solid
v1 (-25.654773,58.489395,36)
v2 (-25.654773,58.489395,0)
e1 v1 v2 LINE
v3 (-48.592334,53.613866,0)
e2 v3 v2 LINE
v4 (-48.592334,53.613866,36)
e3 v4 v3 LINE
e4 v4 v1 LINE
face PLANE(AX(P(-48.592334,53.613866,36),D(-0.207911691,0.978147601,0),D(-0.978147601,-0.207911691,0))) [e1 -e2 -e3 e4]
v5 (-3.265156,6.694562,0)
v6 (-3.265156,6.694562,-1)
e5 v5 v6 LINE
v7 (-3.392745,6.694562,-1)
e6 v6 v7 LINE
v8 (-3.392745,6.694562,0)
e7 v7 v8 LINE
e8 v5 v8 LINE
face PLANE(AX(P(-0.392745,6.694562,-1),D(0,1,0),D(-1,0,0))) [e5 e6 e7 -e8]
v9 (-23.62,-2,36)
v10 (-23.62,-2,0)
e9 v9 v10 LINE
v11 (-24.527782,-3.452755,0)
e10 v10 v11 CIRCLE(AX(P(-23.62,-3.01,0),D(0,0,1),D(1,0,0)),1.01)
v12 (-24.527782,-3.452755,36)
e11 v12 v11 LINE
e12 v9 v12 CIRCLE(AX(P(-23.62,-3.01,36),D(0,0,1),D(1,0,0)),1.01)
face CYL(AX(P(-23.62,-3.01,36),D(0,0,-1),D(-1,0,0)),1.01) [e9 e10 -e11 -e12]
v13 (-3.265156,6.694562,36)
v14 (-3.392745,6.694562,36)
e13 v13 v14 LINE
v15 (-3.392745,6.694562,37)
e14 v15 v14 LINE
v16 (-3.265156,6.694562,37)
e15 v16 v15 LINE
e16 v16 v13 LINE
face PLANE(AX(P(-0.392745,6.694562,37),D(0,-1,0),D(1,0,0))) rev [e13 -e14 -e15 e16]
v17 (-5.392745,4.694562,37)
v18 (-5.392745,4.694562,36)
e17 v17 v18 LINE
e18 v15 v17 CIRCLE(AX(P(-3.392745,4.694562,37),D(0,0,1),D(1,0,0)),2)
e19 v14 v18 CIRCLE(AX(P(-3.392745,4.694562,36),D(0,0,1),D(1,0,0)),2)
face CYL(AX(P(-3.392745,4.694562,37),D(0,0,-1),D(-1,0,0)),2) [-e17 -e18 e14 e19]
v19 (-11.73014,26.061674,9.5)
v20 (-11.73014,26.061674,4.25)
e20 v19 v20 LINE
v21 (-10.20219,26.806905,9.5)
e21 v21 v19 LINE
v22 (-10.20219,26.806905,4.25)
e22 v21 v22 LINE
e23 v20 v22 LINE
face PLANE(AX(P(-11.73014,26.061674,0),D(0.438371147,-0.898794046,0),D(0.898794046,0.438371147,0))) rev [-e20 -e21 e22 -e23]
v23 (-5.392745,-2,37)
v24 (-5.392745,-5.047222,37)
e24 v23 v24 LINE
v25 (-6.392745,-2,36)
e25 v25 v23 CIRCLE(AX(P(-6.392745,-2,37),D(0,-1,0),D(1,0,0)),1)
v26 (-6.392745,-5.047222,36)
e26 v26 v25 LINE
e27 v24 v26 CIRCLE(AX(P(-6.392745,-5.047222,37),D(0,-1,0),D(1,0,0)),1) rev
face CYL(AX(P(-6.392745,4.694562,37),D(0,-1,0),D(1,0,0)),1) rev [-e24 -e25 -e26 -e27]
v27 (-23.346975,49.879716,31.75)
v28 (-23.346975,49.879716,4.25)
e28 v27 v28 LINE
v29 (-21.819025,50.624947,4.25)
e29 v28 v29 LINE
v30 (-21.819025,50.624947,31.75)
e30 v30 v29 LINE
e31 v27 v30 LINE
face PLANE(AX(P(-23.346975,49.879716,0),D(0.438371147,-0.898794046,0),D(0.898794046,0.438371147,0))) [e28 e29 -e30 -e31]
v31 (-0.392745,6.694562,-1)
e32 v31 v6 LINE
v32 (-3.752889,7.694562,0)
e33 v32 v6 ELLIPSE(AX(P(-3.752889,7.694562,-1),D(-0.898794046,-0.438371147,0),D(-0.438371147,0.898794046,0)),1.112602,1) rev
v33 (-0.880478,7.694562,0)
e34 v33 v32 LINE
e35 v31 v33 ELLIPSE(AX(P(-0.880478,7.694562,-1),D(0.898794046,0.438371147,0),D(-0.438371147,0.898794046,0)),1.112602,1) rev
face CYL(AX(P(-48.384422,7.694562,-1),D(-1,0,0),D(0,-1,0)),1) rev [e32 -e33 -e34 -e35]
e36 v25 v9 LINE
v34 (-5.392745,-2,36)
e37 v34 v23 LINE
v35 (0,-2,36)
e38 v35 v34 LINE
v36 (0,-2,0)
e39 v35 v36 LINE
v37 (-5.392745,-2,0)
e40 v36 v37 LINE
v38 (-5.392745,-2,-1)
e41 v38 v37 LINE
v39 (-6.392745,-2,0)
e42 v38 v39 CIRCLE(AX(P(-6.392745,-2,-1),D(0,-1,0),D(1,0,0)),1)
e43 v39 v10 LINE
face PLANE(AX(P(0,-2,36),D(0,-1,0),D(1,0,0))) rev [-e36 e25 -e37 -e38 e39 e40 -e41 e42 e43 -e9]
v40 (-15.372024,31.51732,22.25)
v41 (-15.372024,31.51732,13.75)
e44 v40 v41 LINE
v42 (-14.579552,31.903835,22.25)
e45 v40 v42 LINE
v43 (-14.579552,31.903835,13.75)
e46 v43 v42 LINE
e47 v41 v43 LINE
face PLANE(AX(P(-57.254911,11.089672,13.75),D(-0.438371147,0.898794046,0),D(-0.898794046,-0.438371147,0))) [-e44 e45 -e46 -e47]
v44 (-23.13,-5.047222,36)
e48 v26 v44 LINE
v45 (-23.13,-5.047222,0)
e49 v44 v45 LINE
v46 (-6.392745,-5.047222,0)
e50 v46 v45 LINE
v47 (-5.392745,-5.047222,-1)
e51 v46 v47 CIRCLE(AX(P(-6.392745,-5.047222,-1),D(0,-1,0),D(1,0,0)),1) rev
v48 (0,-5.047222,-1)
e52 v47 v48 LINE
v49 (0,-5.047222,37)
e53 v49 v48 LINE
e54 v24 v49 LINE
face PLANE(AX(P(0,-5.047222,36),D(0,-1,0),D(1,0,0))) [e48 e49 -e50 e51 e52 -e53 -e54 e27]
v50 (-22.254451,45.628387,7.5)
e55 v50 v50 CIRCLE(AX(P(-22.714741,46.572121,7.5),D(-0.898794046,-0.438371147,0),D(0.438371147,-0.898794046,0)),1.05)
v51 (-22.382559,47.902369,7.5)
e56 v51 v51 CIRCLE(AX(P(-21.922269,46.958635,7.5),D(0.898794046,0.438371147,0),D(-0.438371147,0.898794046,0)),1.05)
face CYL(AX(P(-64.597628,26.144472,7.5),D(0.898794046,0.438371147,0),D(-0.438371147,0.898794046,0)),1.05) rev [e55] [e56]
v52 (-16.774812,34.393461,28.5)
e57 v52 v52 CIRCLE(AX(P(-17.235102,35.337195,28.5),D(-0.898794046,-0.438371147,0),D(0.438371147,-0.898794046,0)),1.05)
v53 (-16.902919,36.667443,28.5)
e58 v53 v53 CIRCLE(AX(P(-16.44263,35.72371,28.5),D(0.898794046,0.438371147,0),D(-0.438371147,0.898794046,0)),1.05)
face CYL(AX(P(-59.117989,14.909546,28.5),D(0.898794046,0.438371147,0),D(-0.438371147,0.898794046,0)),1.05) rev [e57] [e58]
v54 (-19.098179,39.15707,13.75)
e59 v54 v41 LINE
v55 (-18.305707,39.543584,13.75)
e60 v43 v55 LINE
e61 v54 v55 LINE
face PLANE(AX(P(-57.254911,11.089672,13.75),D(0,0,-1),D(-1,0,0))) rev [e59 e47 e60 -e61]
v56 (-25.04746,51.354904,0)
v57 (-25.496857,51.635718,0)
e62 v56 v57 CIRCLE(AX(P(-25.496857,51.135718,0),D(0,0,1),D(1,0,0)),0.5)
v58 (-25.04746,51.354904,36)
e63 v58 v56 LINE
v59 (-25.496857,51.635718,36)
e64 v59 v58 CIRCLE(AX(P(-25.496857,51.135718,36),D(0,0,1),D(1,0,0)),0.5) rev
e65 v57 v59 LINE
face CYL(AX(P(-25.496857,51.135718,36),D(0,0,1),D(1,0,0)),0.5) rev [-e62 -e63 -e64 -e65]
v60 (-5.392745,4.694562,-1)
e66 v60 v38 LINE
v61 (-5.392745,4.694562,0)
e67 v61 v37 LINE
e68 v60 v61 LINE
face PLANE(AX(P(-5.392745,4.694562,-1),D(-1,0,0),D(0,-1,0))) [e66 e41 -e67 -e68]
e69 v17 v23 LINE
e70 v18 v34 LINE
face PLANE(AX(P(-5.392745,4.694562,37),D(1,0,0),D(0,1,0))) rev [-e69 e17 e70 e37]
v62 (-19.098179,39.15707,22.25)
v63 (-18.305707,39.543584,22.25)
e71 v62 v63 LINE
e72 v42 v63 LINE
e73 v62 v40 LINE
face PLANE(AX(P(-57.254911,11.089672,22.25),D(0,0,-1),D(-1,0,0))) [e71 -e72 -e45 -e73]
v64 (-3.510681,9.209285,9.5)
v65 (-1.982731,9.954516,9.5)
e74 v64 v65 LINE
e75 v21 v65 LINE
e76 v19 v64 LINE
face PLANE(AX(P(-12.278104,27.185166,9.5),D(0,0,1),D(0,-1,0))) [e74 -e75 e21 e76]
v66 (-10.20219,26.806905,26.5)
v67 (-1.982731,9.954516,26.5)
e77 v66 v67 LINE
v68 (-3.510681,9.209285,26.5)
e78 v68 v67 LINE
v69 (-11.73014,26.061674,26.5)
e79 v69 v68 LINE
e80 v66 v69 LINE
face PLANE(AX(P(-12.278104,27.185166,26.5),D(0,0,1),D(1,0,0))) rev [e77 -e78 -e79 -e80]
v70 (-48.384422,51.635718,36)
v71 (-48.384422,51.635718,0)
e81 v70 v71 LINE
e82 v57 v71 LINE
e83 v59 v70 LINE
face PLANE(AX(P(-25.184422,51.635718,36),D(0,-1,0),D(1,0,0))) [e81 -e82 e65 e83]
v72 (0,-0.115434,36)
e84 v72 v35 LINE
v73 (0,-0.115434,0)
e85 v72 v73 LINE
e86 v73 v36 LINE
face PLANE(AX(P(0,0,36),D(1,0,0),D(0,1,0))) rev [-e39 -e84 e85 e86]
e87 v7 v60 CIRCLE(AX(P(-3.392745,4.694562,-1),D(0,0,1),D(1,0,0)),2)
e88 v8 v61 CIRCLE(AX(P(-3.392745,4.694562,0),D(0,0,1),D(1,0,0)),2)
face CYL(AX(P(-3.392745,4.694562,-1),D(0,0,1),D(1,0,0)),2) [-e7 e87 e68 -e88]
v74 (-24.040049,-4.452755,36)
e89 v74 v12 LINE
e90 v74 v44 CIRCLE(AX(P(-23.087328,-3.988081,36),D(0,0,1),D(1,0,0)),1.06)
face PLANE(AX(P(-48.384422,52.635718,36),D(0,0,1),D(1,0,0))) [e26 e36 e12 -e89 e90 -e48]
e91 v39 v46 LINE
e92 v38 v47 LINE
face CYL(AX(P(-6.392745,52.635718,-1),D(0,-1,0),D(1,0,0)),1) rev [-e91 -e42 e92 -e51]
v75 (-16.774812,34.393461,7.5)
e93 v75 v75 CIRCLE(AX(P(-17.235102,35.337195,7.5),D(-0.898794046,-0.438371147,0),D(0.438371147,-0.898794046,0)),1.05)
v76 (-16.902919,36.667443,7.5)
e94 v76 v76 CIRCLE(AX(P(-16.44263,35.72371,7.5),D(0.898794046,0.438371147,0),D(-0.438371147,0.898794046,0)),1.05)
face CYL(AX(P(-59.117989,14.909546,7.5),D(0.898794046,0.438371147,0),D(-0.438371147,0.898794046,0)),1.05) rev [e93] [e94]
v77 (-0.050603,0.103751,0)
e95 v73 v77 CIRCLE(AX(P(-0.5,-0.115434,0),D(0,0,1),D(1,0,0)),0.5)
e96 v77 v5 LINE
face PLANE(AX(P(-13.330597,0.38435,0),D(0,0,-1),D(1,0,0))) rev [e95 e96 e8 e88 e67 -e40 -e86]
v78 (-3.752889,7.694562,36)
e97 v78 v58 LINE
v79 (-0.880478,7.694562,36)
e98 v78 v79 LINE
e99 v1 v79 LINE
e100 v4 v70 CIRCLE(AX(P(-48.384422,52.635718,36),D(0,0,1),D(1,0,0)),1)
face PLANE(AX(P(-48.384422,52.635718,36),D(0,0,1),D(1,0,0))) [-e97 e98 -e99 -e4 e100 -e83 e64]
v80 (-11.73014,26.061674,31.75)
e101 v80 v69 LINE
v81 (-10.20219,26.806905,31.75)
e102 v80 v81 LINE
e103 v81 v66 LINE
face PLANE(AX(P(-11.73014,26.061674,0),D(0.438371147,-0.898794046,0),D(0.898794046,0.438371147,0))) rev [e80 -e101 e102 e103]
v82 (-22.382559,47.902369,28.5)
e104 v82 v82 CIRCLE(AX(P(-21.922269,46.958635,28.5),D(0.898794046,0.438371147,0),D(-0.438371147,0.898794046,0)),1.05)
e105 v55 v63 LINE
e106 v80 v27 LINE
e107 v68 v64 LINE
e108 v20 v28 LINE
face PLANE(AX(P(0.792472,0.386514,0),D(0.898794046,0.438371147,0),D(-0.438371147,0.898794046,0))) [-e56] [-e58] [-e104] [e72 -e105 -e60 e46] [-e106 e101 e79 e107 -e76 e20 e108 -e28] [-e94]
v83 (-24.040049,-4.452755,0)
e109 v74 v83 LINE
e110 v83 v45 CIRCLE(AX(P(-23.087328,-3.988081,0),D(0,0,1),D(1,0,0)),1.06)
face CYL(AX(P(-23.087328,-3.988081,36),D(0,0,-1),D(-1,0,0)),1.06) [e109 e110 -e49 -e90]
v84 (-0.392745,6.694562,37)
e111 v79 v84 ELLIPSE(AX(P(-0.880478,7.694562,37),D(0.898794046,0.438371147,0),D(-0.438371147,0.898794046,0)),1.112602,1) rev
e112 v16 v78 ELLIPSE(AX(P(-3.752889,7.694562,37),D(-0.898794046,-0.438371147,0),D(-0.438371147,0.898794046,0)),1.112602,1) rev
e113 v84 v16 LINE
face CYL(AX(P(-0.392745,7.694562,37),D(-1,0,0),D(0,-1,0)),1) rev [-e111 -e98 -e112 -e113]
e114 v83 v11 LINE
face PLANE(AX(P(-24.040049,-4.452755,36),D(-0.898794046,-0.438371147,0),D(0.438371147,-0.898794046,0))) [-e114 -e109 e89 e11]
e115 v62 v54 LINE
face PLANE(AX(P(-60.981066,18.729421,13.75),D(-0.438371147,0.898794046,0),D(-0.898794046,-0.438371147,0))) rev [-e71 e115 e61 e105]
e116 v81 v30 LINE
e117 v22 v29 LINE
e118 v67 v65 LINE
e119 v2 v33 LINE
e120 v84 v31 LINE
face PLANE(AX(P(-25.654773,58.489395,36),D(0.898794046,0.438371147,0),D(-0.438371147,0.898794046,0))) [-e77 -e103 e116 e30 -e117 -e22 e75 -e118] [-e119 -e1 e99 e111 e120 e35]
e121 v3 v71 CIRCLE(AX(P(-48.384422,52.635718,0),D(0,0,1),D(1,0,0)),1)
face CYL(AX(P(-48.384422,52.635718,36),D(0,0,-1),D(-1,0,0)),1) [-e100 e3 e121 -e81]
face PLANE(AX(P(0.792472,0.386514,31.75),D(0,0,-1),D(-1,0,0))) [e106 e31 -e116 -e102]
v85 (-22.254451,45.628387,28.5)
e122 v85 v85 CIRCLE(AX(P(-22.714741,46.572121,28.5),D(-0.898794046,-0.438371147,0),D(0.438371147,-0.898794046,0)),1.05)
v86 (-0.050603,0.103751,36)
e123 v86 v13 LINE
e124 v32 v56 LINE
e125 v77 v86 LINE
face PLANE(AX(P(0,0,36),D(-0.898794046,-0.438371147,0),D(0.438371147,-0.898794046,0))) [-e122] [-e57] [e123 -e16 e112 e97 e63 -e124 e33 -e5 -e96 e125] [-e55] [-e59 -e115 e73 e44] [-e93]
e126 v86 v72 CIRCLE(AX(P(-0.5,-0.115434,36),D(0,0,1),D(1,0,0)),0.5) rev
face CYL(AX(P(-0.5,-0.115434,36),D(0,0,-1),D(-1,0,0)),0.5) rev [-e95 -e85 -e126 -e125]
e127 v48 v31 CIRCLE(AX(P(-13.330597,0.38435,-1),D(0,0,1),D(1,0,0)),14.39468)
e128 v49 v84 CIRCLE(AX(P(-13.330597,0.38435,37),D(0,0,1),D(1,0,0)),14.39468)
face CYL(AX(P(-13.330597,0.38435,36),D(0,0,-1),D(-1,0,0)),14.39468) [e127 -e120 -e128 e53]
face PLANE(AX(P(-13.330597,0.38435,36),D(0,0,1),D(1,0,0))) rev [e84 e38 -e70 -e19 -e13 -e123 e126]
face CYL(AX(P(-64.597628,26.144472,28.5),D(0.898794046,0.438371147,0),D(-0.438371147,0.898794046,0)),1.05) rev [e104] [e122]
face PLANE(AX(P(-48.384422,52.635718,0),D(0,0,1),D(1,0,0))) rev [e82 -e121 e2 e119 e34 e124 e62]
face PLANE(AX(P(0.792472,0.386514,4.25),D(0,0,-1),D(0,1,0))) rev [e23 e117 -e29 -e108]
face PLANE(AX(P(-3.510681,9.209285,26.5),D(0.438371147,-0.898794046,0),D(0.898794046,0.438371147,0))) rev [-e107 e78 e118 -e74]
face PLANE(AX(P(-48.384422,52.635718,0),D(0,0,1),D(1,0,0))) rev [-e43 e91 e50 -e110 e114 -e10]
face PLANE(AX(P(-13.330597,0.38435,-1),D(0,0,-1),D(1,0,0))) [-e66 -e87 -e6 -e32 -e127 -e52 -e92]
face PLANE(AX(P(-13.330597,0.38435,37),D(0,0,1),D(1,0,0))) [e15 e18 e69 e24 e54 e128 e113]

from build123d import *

# Parameters (mm, degrees)
BOSS_EXTRUDE1_DEPTH = 36
SKETCH4_R           = 1.05
SKETCH4_W           = 8.5
SKETCH4_H           = 8.5
CUT_EXTRUDE1_DEPTH  = 86.201472175
SKETCH4_3_W         = 27.5
SKETCH4_3_H         = 26.5
SKETCH4_3_W_2       = 25
SKETCH4_3_H_2       = 24
SKETCH4_3_R         = 1.05
SKETCH4_3_W_3       = 8.5
SKETCH4_3_H_3       = 8.5
CUT_EXTRUDE2_DEPTH  = 1.7
SKETCH5_W           = 17
SKETCH5_H           = 20
CUT_EXTRUDE3_DEPTH  = 1.7
FILLET1_R           = 0.5
BOSS_EXTRUDE2_DEPTH = 1
FILLET2_R           = 1
FILLET3_R           = 1


with BuildPart() as part:
    # Sketch2 → Boss-Extrude1 (new body)
    with BuildSketch(Plane.XY):
        with BuildLine():
            Line((0, 0), (-25.184422383, 51.63571796))
            Line((-25.184422383, 51.63571796), (-48.384422383, 51.63571796))
            ThreePointArc((-48.384422383, 51.63571796), (-49.378944278, 52.531189497), (-48.592334074, 53.613865561))
            Line((-48.592334074, 53.613865561), (-25.654772837, 58.48939471))
            Line((-25.654772837, 58.48939471), (-0.392745057, 6.694562109))
            ThreePointArc((-0.392745057, 6.694562109), (1.056036581, 0.865561175), (0, -5.047222168))
            Line((0, -5.047222168), (-23.13, -5.047222168))
            ThreePointArc((-23.13, -5.047222168), (-23.667026027, -4.875521503), (-24.040049398, -4.452754858))
            Line((-24.040049398, -4.452754858), (-24.527781987, -3.452754858))
            ThreePointArc((-24.527781987, -3.452754858), (-24.476528577, -2.474781543), (-23.62, -2))
            Line((-23.62, -2), (0, -2))
            Line((0, -2), (0, 0))
        make_face()
    extrude(amount=BOSS_EXTRUDE1_DEPTH)

    # Sketch4 → Cut-Extrude1 (cut, through all)
    with BuildSketch(Plane(origin=(2.320421937, 1.131745398, 0), x_dir=(0, 0, -1), z_dir=(0.898794046299168, 0.4383711467890754, 0))):
        with Locations(Location((-28.5, 51.816231926, 0), (0, 0, 90))):
            Circle(SKETCH4_R)
        with Locations(Location((-28.5, 39.316231926, 0), (0, 0, 90))):
            Circle(SKETCH4_R)
        with Locations(Location((-7.5, 51.816231926, 0), (0, 0, 90))):
            Circle(SKETCH4_R)
        with Locations(Location((-7.5, 39.316231926, 0), (0, 0, 90))):
            Circle(SKETCH4_R)
        with Locations((-18, 39.316231926)):
            Rectangle(SKETCH4_W, SKETCH4_H)
    extrude(amount=-CUT_EXTRUDE1_DEPTH, mode=Mode.SUBTRACT)

    # Sketch4<3> → Cut-Extrude2 (cut)
    # profile 1 of 2: a face of its own
    with BuildSketch(Plane(origin=(2.320421937, 1.131745398, 0), x_dir=(0, 0, -1), z_dir=(0.898794046299168, 0.4383711467890754, 0))):
        with Locations((-18, 41.816231926)):
            Rectangle(SKETCH4_3_W, SKETCH4_3_H)
        with Locations((-18, 41.816231926)):
            Rectangle(SKETCH4_3_W_2, SKETCH4_3_H_2, mode=Mode.SUBTRACT)
    # profile 2 of 2: a face of its own
    with BuildSketch(Plane(origin=(2.320421937, 1.131745398, 0), x_dir=(0, 0, -1), z_dir=(0.898794046299168, 0.4383711467890754, 0))):
        with Locations((-18, 41.816231926)):
            Rectangle(SKETCH4_3_W_2, SKETCH4_3_H_2)
        with Locations(Location((-7.5, 39.316231926, 0), (0, 0, 90))):
            Circle(SKETCH4_3_R, mode=Mode.SUBTRACT)
        with Locations(Location((-7.5, 51.816231926, 0), (0, 0, 90))):
            Circle(SKETCH4_3_R, mode=Mode.SUBTRACT)
        with Locations(Location((-28.5, 39.316231926, 0), (0, 0, 90))):
            Circle(SKETCH4_3_R, mode=Mode.SUBTRACT)
        with Locations(Location((-28.5, 51.816231926, 0), (0, 0, 90))):
            Circle(SKETCH4_3_R, mode=Mode.SUBTRACT)
        with Locations((-18, 39.316231926)):
            Rectangle(SKETCH4_3_W_3, SKETCH4_3_H_3, mode=Mode.SUBTRACT)
    extrude(amount=-CUT_EXTRUDE2_DEPTH, mode=Mode.SUBTRACT)

    # Sketch5 → Cut-Extrude3 (cut)
    with BuildSketch(Plane(origin=(2.320421937, 1.131745398, 0), x_dir=(0, 0, -1), z_dir=(0.898794046299168, 0.4383711467890754, 0))):
        with Locations((-18, 19.816231926)):
            Rectangle(SKETCH5_W, SKETCH5_H)
    extrude(amount=-CUT_EXTRUDE3_DEPTH, mode=Mode.SUBTRACT)

    # Fillet1
    fillet1_edges = [part.edges().sort_by_distance(p)[0] for p in [
        (0, 0, 18),
        (-25.184422383, 51.63571796, 18),
    ]]
    fillet(fillet1_edges, radius=FILLET1_R)

    # Sketch6 → Boss-Extrude2 (add)
    with BuildSketch(Plane.XY.offset(36)):
        with BuildLine():
            Line((-0.392745057, 6.694562109), (-3.392745057, 6.694562109))
            ThreePointArc((-3.392745057, 6.694562109), (-4.80695862, 6.108775671), (-5.392745057, 4.694562109))
            Line((-5.392745057, 4.694562109), (-5.392745057, -5.047222168))
            Line((-5.392745057, -5.047222168), (0, -5.047222168))
            ThreePointArc((0, -5.047222168), (1.056036581, 0.865561175), (-0.392745057, 6.694562109))
        make_face()
    boss_extrude2 = extrude(amount=BOSS_EXTRUDE2_DEPTH)

    # Fillet2
    # the kernel refuses this fillet: 1 mm, written as the material it adds along each edge
    with BuildSketch(Plane(origin=(-5.392745057, -2, 36), x_dir=(-1, 0, 0), z_dir=(0, -1, 0))) as fillet2_piece_1:
        with BuildLine():
            CenterArc((FILLET2_R, -FILLET2_R), FILLET2_R, 90, 90)
            Line((0, -FILLET2_R), (0, 0))
            Line((0, 0), (FILLET2_R, 0))
        make_face()
    extrude(amount=3.047222168)
    with BuildSketch(Plane(origin=(2.107254943, 6.694562109, 36), x_dir=(0, 0, 1), z_dir=(-1, 0, 0))) as fillet2_piece_2_section:
        with BuildLine():
            CenterArc((FILLET2_R, FILLET2_R), FILLET2_R, 180, 90)
            Line((0, FILLET2_R), (0, 0))
            Line((0, 0), (FILLET2_R, 0))
        make_face()
    fillet2_piece_2 = extrude(amount=7.872411049, mode=Mode.PRIVATE)
    fillet2_piece_2 = split(fillet2_piece_2, bisect_by=Plane(origin=(-0.632231225, 7.185581517, 36.086380113), z_dir=(-0.8987940462991679, -0.4383711467890754, 0)), keep=Keep.TOP, mode=Mode.PRIVATE)
    fillet2_piece_2 = split(fillet2_piece_2, bisect_by=Plane(origin=(-2.952653161, 6.053836119, 36.086380113), z_dir=(0.898794046299168, 0.43837114678907535, 0)), keep=Keep.TOP, mode=Mode.PRIVATE)
    add(fillet2_piece_2)

    # Mirror3: Boss-Extrude2 across plane
    add(boss_extrude2.mirror(Plane(origin=(0, 0, 18), x_dir=(1, 0, 0), z_dir=(0, 0, -1))))

    # Fillet3
    # the kernel refuses this fillet: 1 mm, written as the material it adds along each edge
    with BuildSketch(Plane(origin=(-5.392745057, -2, 0), x_dir=(-1, 0, 0), z_dir=(0, -1, 0))) as fillet3_piece_1:
        with BuildLine():
            CenterArc((FILLET3_R, FILLET3_R), FILLET3_R, 180, 90)
            Line((0, FILLET3_R), (0, 0))
            Line((0, 0), (FILLET3_R, 0))
        make_face()
    extrude(amount=3.047222168)
    with BuildSketch(Plane(origin=(2.107254943, 6.694562109, 0), x_dir=(0, 1, 0), z_dir=(-1, 0, 0))) as fillet3_piece_2_section:
        with BuildLine():
            CenterArc((FILLET3_R, FILLET3_R), FILLET3_R, 180, 90)
            Line((0, FILLET3_R), (0, 0))
            Line((0, 0), (FILLET3_R, 0))
        make_face()
    fillet3_piece_2 = extrude(amount=7.872411049, mode=Mode.PRIVATE)
    fillet3_piece_2 = split(fillet3_piece_2, bisect_by=Plane(origin=(-2.952649492, 6.053828597, -0.086392955), z_dir=(0.8987940462991654, 0.43837114678908073, 0)), keep=Keep.TOP, mode=Mode.PRIVATE)
    fillet3_piece_2 = split(fillet3_piece_2, bisect_by=Plane(origin=(-0.632227556, 7.185573995, -0.086392955), z_dir=(-0.8987940462991654, -0.43837114678908073, 0)), keep=Keep.TOP, mode=Mode.PRIVATE)
    add(fillet3_piece_2)


solid = part.part
